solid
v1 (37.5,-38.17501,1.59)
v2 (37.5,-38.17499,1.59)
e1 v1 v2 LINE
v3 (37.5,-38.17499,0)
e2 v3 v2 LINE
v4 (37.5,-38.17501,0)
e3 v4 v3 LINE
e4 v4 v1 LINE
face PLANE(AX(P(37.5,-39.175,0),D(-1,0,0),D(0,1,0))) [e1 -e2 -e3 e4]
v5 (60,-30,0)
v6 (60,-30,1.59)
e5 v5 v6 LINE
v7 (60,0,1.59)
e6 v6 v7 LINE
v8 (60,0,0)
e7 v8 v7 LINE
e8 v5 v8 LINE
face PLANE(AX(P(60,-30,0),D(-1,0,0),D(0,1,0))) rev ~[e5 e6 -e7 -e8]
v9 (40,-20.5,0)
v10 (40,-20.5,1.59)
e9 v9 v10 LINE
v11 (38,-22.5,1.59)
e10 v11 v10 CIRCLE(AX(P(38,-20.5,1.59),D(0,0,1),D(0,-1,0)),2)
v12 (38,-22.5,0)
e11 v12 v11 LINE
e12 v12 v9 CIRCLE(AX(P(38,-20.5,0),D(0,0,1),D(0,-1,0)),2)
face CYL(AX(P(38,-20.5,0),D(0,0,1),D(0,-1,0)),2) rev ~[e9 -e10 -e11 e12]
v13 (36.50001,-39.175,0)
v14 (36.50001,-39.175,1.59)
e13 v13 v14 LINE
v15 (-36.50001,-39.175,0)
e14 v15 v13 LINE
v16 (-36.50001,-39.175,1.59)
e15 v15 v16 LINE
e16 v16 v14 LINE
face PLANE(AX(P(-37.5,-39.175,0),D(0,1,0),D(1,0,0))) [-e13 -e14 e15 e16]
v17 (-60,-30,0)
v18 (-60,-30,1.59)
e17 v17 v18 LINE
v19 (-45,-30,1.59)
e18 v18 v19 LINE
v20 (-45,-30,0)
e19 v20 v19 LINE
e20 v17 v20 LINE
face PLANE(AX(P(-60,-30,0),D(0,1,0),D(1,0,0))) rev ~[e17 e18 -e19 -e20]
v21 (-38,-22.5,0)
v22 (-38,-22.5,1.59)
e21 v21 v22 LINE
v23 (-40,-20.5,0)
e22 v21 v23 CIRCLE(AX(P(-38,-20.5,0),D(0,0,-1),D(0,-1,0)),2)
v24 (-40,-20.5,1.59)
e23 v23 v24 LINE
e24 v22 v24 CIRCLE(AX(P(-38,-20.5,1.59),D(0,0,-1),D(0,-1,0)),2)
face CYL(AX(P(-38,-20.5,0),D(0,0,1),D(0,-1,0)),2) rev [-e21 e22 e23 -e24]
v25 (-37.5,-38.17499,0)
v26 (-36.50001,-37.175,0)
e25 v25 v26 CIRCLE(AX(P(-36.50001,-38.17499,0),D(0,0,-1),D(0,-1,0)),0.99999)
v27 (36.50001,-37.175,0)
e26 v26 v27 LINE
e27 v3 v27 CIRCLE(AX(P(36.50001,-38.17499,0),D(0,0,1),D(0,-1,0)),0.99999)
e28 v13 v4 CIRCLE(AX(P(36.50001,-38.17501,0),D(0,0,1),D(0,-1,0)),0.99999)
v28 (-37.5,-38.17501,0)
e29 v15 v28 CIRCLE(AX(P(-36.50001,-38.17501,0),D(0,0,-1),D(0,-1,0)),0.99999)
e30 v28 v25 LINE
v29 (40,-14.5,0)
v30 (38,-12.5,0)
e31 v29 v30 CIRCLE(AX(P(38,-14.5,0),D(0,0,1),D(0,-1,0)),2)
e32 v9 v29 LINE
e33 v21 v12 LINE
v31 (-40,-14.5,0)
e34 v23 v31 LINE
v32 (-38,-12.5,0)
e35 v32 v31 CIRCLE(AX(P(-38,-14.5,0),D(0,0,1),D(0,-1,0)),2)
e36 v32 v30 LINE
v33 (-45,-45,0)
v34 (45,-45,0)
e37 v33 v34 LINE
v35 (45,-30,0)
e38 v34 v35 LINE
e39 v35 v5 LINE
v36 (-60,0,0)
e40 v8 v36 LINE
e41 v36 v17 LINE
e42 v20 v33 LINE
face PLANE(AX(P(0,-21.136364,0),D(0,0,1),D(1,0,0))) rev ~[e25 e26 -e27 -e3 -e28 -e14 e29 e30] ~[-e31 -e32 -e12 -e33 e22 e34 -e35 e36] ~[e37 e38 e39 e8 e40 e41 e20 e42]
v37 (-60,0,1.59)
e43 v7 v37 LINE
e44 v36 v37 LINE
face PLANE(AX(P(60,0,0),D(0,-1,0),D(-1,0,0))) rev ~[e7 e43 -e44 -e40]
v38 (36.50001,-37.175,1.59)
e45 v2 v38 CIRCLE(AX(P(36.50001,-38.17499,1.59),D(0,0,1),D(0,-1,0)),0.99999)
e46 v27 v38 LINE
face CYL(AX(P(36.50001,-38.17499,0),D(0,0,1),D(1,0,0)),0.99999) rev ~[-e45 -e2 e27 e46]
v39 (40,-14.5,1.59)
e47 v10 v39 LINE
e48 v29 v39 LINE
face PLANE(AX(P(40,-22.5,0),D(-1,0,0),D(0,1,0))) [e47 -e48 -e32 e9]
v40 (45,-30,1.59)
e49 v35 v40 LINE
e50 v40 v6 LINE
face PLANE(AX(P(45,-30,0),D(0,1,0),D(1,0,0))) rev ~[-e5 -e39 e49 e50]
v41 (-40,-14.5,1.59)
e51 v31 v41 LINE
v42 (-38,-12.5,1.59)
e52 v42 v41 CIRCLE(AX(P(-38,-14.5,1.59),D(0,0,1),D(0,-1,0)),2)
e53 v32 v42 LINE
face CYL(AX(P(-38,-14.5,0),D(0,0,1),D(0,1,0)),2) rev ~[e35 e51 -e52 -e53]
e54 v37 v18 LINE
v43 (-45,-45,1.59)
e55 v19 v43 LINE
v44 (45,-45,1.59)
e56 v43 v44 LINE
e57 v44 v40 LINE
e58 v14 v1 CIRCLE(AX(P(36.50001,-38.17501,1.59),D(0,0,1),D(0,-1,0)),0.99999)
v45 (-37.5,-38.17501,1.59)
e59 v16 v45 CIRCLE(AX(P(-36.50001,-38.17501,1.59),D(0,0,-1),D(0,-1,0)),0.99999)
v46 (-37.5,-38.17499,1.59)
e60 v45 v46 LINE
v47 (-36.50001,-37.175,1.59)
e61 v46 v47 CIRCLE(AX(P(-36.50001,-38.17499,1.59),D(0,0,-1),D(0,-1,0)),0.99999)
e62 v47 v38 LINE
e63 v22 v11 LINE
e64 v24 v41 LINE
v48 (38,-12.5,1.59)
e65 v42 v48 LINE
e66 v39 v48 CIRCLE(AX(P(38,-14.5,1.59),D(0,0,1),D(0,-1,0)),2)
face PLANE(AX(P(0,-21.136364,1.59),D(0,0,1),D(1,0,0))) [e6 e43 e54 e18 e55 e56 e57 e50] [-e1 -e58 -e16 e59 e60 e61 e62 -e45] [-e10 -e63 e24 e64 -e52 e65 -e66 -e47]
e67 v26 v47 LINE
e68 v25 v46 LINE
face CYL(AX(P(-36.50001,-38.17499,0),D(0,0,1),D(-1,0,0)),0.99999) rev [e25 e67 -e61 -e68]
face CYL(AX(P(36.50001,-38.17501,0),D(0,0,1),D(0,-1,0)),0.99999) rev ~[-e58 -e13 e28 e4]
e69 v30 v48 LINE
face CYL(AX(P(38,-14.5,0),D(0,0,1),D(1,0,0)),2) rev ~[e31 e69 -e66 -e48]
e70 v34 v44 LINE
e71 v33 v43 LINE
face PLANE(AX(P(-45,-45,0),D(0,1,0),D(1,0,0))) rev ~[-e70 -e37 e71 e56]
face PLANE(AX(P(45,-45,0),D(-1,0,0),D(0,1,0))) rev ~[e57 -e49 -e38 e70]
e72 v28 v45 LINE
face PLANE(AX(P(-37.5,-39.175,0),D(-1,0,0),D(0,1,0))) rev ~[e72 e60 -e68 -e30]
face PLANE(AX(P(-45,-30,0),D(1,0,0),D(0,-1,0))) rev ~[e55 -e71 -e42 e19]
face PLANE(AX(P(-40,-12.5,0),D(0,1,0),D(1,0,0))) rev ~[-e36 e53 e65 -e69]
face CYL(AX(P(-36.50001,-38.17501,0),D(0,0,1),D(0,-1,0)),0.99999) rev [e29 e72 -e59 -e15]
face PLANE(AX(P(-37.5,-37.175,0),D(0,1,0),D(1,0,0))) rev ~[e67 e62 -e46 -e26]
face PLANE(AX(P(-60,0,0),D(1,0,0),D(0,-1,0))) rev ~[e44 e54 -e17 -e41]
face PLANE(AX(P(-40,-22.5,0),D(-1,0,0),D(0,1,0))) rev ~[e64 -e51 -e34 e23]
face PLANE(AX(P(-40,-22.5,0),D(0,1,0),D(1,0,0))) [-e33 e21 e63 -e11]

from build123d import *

# Parameters (mm, degrees)
F0_W     = 75
F0_H     = 2
F0_W_2   = 80
F0_H_2   = 10
F1_DEPTH = 1.59
F2_R     = 2
F3_R     = 0.99999


# Not quite as in the source:
# - a fillet or chamfer is up to 0.001 mm smaller than in the source, because OpenCascade refuses the exact size


with BuildPart() as f1:
    # F0 (on Top) → F1 (new body)
    with BuildSketch(Plane.XY):
        Polygon((45, 0), (-45, 0), (-60, 0), (-60, -30), (-45, -30), (-45, -45), (45, -45), (45, -30), (60, -30), (60, 0), align=None)
        with Locations((0, -38.175)):
            Rectangle(F0_W, F0_H, mode=Mode.SUBTRACT)
        with Locations((0, -17.5)):
            Rectangle(F0_W_2, F0_H_2, mode=Mode.SUBTRACT)
    extrude(amount=F1_DEPTH)

    # F2
    f2_edges = [f1.edges().sort_by_distance(p)[0] for p in [
        (40, -22.5, 0.795),
        (-40, -12.5, 0.795),
        (40, -12.5, 0.795),
        (-40, -22.5, 0.795),
    ]]
    fillet(f2_edges, radius=F2_R)

    # F3 (radius 1 in the source; OpenCascade refuses exactly that, so slightly less here)
    f3_edges = [f1.edges().sort_by_distance(p)[0] for p in [
        (-37.5, -37.175, 0.795),
        (37.5, -37.175, 0.795),
        (37.5, -39.175, 0.795),
        (-37.5, -39.175, 0.795),
    ]]
    fillet(f3_edges, radius=F3_R)


solid = f1.part
